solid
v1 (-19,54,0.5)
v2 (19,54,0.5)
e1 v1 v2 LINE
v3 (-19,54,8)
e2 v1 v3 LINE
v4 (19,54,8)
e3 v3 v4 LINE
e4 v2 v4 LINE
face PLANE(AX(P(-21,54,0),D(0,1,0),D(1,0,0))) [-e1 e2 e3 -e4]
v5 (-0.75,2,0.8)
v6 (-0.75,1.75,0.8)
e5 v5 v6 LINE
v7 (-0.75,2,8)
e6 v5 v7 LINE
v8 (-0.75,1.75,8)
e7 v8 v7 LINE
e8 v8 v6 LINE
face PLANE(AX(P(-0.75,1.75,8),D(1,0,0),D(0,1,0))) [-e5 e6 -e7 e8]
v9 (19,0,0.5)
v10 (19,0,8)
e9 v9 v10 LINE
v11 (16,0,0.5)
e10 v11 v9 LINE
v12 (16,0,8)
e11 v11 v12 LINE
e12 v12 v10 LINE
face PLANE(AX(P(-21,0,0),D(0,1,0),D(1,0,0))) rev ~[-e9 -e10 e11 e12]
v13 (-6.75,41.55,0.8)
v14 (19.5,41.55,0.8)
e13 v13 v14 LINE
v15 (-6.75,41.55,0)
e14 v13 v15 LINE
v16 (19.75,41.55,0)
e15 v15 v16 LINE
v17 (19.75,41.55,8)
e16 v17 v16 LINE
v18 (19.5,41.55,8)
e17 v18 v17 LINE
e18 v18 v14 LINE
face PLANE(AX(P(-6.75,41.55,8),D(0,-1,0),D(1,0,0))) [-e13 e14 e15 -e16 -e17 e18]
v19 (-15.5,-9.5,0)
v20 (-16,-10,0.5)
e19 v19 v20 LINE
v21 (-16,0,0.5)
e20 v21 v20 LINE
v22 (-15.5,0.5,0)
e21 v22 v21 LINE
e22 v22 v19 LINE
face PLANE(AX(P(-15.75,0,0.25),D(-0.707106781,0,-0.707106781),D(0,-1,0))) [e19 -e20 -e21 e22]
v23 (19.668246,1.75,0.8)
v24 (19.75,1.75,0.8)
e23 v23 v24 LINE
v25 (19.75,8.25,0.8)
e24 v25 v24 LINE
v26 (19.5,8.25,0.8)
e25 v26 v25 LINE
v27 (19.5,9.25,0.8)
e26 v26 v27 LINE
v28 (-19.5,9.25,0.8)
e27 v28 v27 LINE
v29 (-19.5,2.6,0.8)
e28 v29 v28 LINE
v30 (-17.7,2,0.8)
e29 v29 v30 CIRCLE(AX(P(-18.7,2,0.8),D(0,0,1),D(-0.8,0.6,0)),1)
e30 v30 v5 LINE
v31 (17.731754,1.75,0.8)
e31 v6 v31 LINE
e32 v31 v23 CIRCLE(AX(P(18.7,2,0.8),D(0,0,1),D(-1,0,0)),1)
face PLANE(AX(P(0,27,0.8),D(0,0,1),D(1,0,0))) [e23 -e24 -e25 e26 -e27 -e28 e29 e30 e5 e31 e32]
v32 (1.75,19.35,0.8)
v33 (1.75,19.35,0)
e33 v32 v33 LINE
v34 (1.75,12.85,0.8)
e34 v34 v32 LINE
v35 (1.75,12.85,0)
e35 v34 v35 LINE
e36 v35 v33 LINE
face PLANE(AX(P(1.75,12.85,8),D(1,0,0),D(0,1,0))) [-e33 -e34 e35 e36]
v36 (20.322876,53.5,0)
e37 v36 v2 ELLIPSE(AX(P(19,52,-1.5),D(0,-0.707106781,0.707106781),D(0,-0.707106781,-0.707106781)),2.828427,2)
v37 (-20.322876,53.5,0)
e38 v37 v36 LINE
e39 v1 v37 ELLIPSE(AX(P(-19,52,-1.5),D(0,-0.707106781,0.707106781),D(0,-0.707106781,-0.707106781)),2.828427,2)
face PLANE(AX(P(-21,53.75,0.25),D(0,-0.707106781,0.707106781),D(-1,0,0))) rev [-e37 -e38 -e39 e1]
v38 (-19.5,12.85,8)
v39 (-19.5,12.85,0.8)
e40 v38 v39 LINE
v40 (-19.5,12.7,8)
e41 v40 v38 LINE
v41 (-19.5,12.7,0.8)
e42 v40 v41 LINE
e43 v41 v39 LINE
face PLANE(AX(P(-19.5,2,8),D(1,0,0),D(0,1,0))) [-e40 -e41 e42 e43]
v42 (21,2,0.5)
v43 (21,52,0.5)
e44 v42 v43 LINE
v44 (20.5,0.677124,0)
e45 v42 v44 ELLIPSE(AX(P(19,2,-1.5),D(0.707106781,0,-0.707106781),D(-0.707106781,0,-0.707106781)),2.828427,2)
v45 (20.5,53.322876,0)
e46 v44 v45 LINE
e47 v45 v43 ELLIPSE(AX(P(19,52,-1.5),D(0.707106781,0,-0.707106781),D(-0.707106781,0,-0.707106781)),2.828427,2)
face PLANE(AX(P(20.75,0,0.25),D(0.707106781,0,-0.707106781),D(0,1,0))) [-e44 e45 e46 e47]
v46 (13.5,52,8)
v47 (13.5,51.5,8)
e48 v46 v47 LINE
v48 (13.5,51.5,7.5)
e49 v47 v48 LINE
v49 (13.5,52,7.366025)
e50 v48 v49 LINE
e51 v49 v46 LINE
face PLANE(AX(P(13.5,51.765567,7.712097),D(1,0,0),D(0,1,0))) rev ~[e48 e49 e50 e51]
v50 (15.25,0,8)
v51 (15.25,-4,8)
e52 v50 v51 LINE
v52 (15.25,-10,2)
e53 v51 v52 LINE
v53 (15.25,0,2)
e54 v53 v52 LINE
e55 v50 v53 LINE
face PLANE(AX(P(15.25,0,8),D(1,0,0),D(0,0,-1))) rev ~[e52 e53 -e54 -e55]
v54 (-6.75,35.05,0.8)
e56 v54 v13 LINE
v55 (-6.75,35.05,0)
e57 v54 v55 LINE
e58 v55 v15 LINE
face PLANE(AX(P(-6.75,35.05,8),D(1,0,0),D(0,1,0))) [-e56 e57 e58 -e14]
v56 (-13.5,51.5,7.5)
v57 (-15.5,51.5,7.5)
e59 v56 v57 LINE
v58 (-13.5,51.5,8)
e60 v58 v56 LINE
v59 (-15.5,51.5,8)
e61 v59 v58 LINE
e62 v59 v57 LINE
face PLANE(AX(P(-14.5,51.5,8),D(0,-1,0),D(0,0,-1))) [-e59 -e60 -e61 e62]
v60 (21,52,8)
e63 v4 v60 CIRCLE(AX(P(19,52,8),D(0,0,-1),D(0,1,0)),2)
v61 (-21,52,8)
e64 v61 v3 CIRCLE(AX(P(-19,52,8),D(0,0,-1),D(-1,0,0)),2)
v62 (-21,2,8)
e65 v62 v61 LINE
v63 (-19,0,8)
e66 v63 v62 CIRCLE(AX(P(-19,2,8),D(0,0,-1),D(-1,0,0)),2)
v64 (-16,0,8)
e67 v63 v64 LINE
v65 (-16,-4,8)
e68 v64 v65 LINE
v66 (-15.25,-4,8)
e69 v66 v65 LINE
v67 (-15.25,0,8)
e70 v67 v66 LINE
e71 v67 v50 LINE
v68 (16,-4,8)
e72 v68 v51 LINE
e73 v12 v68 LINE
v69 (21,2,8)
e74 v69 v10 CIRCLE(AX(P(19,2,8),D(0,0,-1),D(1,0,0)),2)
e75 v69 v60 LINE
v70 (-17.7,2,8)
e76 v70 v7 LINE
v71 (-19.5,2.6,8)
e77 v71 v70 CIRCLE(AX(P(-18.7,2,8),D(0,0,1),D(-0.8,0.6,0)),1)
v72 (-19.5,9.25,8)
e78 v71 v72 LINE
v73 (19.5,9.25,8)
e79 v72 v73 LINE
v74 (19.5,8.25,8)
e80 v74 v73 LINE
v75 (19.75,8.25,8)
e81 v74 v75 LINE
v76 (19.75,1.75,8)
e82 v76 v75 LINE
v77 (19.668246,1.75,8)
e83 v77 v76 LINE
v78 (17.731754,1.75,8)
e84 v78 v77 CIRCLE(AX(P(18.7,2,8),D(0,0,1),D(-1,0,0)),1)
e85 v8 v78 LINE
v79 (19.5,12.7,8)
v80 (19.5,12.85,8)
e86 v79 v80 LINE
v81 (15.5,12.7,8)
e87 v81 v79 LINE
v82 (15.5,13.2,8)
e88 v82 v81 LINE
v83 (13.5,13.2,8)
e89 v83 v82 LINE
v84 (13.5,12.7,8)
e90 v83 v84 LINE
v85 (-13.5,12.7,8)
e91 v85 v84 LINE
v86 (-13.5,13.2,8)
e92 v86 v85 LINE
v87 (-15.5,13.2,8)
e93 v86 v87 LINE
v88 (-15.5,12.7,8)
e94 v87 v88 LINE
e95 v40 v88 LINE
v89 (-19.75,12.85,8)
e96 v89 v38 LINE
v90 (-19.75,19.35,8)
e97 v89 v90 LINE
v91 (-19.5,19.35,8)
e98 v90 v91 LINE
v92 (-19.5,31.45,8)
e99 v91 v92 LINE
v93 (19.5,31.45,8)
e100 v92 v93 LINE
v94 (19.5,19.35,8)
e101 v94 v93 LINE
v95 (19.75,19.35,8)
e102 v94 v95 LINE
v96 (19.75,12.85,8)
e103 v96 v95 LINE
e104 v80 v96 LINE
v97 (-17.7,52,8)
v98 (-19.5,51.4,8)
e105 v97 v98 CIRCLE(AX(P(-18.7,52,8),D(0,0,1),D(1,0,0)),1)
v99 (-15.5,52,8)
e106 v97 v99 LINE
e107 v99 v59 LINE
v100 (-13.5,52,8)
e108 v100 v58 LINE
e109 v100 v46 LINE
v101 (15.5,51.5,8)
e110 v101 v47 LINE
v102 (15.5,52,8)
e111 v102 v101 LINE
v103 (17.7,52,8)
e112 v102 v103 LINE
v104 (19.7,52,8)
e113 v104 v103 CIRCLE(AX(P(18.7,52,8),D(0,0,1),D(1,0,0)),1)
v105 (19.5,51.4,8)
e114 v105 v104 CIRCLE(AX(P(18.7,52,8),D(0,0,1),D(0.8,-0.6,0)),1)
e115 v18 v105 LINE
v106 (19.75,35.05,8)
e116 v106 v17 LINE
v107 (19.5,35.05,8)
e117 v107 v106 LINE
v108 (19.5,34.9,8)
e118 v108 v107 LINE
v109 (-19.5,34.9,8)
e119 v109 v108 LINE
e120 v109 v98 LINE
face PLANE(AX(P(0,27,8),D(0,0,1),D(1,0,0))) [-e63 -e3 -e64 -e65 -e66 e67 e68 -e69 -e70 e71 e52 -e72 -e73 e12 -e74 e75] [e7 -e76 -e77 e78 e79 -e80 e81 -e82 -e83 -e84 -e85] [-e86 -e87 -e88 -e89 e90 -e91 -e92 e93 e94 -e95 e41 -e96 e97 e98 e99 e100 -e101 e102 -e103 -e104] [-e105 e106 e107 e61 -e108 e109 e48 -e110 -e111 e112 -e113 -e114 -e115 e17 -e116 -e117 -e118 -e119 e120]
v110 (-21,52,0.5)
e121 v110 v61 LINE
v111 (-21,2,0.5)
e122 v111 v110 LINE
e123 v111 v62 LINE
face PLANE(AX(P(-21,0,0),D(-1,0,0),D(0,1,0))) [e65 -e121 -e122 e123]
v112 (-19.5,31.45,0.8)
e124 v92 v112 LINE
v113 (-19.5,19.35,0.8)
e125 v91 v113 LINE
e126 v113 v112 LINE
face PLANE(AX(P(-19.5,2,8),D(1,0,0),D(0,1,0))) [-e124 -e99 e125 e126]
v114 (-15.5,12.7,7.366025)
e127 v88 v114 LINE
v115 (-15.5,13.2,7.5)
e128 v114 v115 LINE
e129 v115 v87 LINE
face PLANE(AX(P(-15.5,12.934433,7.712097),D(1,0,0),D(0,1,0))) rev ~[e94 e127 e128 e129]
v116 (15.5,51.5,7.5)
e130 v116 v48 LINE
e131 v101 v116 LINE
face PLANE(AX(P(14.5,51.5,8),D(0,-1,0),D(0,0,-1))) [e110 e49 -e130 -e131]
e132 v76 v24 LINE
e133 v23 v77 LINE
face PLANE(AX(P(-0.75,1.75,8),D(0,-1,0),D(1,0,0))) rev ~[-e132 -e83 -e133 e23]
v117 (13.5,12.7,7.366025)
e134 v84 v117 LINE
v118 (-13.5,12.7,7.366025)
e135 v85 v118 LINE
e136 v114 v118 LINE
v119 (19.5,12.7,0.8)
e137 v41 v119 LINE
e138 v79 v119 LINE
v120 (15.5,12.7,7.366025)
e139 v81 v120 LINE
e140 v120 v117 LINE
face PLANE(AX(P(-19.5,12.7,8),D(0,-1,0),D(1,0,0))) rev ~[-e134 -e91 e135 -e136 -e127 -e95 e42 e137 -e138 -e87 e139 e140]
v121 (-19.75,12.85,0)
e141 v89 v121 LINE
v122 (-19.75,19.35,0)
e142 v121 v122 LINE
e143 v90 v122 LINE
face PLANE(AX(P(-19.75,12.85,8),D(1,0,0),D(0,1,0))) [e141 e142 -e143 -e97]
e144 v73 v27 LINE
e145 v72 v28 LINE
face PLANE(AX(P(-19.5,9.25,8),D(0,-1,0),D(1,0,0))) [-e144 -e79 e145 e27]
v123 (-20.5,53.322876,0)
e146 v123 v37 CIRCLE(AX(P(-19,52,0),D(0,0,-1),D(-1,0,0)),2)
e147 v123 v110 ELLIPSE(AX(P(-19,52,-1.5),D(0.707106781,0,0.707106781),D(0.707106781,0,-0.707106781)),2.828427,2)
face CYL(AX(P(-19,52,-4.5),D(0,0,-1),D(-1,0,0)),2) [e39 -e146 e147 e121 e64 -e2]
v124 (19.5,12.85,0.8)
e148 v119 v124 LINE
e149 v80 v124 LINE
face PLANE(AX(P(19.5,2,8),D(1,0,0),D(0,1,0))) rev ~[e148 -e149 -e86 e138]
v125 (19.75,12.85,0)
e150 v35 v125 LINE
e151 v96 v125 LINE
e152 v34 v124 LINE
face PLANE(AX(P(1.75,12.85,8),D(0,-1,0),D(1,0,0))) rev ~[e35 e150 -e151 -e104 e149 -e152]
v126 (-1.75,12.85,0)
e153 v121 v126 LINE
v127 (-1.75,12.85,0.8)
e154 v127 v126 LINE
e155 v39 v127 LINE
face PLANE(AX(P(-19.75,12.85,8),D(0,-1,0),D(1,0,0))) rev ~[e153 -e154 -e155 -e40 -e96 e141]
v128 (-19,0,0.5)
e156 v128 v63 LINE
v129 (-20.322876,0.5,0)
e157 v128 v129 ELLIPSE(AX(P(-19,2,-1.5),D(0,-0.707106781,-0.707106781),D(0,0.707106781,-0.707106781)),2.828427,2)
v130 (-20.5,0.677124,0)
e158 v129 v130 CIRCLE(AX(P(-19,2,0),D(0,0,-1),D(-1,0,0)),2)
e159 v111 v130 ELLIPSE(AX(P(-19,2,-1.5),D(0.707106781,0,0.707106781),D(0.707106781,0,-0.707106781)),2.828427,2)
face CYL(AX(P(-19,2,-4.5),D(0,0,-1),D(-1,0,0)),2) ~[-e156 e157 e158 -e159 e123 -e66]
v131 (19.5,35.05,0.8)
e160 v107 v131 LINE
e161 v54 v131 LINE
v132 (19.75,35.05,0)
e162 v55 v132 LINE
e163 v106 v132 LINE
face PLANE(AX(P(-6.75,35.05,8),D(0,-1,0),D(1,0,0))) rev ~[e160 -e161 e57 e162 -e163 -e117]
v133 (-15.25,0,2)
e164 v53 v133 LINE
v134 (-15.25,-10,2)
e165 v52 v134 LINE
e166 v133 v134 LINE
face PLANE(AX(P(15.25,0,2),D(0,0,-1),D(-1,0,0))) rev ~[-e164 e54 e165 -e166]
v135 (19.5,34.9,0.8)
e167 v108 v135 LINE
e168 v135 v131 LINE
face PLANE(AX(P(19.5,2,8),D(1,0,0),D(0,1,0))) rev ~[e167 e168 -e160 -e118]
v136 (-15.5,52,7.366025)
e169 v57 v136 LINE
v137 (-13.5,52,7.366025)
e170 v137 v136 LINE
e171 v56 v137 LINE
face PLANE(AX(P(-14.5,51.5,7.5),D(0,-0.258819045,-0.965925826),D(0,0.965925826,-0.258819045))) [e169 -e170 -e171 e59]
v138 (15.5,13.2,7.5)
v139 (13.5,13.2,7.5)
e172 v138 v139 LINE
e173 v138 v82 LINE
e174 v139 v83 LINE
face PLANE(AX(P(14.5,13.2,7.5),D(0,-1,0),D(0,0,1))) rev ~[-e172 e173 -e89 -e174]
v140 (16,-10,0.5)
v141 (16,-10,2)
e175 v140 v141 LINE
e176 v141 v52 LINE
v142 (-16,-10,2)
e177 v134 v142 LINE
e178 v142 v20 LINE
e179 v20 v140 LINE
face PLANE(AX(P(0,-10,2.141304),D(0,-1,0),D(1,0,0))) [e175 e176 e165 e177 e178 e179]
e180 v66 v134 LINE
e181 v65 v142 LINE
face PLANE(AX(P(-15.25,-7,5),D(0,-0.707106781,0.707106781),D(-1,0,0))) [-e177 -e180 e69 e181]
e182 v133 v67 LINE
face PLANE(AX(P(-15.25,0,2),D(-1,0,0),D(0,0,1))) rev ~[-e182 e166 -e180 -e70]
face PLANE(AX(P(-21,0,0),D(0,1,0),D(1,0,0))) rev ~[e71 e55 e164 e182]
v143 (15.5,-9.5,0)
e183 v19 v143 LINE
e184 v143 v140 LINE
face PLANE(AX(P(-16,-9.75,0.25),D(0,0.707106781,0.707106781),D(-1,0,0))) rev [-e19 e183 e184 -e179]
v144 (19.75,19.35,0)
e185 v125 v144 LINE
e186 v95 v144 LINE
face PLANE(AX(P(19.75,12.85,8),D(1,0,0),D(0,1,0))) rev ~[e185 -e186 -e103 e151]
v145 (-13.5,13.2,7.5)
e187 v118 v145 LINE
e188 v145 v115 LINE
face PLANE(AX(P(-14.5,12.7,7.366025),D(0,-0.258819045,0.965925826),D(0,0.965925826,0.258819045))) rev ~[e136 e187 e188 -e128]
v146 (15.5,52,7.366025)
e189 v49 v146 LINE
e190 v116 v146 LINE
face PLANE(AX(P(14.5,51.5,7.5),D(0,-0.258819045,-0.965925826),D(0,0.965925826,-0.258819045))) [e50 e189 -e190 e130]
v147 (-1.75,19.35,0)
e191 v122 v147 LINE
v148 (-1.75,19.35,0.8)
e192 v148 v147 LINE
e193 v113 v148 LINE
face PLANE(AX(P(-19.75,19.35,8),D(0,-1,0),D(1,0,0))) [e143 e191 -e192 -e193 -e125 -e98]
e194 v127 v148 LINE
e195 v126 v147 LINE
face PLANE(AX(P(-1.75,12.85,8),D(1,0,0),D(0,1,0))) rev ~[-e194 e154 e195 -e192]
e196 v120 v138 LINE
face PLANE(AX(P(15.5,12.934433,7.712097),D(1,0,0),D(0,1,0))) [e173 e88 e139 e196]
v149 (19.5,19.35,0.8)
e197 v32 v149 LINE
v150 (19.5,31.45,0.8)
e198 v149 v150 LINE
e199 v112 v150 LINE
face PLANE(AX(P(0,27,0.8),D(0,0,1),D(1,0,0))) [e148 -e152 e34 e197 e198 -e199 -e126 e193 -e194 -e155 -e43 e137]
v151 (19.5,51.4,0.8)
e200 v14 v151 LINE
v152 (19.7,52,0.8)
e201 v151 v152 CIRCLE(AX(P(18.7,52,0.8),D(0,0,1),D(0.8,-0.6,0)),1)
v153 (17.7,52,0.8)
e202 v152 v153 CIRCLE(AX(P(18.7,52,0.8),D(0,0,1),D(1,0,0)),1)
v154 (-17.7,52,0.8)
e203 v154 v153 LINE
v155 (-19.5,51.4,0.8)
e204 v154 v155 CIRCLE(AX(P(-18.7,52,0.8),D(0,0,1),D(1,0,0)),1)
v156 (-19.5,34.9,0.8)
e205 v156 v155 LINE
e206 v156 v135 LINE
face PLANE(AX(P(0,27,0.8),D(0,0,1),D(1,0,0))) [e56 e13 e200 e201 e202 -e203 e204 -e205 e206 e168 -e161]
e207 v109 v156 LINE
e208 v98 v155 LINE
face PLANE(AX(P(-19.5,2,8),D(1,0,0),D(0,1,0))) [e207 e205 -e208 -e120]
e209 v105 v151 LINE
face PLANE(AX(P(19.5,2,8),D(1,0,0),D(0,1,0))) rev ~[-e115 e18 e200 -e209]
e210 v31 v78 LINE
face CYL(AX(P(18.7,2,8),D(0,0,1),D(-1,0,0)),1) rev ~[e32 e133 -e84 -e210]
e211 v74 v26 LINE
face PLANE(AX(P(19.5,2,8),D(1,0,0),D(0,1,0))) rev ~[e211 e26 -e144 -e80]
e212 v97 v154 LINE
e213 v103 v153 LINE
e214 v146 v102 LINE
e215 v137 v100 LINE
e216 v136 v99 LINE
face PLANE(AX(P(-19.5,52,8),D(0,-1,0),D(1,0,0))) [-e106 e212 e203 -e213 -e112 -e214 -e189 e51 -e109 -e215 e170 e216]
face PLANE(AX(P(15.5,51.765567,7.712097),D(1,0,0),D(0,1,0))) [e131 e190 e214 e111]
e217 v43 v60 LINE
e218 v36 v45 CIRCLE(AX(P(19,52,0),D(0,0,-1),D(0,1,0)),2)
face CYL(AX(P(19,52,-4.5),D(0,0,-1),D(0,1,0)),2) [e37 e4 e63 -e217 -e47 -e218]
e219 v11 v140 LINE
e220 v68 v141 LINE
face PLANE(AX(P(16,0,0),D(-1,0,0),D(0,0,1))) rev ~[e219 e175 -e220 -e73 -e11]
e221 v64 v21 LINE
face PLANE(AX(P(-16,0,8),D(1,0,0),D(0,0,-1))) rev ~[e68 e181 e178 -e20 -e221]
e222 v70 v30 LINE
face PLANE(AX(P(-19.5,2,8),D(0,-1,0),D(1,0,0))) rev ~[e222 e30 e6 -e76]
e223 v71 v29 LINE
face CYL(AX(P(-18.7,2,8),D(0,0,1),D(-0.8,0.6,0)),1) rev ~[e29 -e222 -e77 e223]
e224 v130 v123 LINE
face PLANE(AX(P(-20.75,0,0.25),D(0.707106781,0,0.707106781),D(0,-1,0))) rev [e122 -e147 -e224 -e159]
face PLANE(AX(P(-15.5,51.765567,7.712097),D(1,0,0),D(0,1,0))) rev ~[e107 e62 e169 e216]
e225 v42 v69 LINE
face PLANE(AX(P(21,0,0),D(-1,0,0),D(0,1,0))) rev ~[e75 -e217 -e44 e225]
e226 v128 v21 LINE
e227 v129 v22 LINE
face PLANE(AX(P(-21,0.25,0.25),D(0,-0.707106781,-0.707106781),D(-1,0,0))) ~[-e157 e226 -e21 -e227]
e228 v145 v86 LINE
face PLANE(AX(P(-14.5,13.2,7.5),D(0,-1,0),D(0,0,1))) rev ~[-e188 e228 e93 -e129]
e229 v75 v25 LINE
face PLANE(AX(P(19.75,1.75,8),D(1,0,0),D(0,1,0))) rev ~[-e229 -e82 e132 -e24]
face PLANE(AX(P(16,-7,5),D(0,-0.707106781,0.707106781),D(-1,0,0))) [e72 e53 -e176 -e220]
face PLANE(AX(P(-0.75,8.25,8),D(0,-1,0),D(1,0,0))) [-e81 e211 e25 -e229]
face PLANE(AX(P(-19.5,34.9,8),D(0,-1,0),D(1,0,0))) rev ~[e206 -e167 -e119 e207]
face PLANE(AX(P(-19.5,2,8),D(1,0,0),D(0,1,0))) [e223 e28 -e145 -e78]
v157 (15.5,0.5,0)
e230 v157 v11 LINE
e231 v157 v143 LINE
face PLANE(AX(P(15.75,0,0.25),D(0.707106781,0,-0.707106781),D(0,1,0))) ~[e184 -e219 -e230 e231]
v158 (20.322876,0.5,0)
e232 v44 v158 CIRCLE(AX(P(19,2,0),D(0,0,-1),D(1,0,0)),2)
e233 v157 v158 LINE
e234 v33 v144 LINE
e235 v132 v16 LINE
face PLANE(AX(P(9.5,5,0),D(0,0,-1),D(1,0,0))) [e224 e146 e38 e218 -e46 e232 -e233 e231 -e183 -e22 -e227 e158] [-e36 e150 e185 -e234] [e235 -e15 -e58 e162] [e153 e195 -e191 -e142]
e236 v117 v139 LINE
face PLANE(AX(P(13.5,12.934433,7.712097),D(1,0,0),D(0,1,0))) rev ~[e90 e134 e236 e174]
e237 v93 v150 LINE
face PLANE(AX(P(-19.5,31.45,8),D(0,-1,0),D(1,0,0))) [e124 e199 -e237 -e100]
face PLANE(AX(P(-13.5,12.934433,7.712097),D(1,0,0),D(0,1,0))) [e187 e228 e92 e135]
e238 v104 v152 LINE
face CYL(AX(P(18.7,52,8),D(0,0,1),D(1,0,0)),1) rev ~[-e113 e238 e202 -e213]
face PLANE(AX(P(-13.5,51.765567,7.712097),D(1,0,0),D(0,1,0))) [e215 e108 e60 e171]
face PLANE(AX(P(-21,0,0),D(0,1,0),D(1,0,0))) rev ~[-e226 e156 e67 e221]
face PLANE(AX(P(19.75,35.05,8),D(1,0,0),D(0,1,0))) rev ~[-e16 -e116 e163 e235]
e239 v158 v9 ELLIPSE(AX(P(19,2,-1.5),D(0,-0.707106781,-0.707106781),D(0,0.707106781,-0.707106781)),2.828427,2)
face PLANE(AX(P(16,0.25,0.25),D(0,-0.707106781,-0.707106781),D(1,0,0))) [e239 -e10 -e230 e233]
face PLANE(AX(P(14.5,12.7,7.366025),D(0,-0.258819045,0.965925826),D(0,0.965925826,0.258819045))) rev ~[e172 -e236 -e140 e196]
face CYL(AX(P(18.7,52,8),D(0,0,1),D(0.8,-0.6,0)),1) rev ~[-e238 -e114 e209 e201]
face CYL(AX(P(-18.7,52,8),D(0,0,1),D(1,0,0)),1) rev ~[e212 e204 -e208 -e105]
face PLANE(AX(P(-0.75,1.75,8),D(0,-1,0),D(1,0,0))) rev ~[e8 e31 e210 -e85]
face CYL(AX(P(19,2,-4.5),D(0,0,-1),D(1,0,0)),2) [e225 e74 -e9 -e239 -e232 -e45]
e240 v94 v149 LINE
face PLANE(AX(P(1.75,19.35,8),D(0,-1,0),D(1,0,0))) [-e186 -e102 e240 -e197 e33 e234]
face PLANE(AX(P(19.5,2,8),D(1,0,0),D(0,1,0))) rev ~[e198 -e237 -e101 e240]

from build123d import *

# Parameters (mm, degrees)
F0_W         = 42
F0_H         = 54
F1_DEPTH     = 8
F2_W         = 39
F2_H         = 50
F3_DEPTH     = 7.2
F5_DEPTH     = 7.2
F6_W         = 20.5
F6_H         = 6.5
F6_W_2       = 18
F6_W_3       = 26.5
F7_DEPTH     = 8.001
F9_DEPTH     = 10
F10_SIZE     = 0.5
F11_T1_DEPTH = 17.5
F12_W        = 39
F12_H        = 3.45
F13_DEPTH    = 7.2
F16_DEPTH    = 1
F19_DEPTH    = 1
F20_SIZE     = 6
F22_W        = 20.5
F22_H        = 6.5
F23_DEPTH    = 0.8


# Not quite as in the source:
# - a fillet or chamfer that OpenCascade refuses, or shapes differently, is made with other operations: its cross-section is extruded or revolved along the edge and cut away or added


with BuildPart() as f1:
    # F0 (on Top) → F1 (new body)
    with BuildSketch(Plane.XY):
        with Locations((0, 27)):
            Rectangle(F0_W, F0_H)
    extrude(amount=F1_DEPTH)

    # F2 (on face) → F3 (cut)
    with BuildSketch(Plane.XY.offset(8)):
        with Locations((0, 27)):
            Rectangle(F2_W, F2_H)
    extrude(amount=-F3_DEPTH, mode=Mode.SUBTRACT)

    # F4 (on face) → F5 (cut, through all)
    with BuildSketch(Plane.XY.offset(8)):
        with BuildLine():
            Line((-19.5, 52), (-17.7, 52))
            ThreePointArc((-17.7, 52), (-19.016227766, 52.9486832981), (-19.5, 51.4))
            Line((-19.5, 51.4), (-19.5, 52))
        make_face()
        with BuildLine():
            ThreePointArc((-19.5, 51.4), (-18.383772234, 51.0513167019), (-17.7, 52))
            Line((-17.7, 52), (-19.5, 52))
            Line((-19.5, 52), (-19.5, 51.4))
        make_face()
        with BuildLine():
            Line((19.5, 52), (17.7, 52))
            ThreePointArc((17.7, 52), (18.383772234, 51.0513167019), (19.5, 51.4))
            Line((19.5, 51.4), (19.5, 52))
        make_face()
        with BuildLine():
            ThreePointArc((19.7, 52), (18.7, 53), (17.7, 52))
            Line((17.7, 52), (19.5, 52))
            Line((19.5, 52), (19.5, 51.4))
            ThreePointArc((19.5, 51.4), (19.6486832981, 51.683772234), (19.7, 52))
        make_face()
        with BuildLine():
            Line((19.5, 2), (19.5, 2.6))
            ThreePointArc((19.5, 2.6), (18.383772234, 2.9486832981), (17.7, 2))
            Line((17.7, 2), (19.5, 2))
        make_face()
        with BuildLine():
            ThreePointArc((-17.7, 2), (-18.383772234, 2.9486832981), (-19.5, 2.6))
            Line((-19.5, 2.6), (-19.5, 2))
            Line((-19.5, 2), (-17.7, 2))
        make_face()
        with BuildLine():
            Line((-19.5, 2), (-19.5, 2.6))
            ThreePointArc((-19.5, 2.6), (-19.016227766, 1.0513167019), (-17.7, 2))
            Line((-17.7, 2), (-19.5, 2))
        make_face()
        with BuildLine():
            ThreePointArc((19.7, 2), (19.6486832981, 2.316227766), (19.5, 2.6))
            Line((19.5, 2.6), (19.5, 2))
            Line((19.5, 2), (17.7, 2))
            ThreePointArc((17.7, 2), (18.7, 1), (19.7, 2))
        make_face()
    extrude(amount=-F5_DEPTH, mode=Mode.SUBTRACT)

    # F6 (on face) → F7 (cut, through all)
    with BuildSketch(Plane.XY.offset(8)):
        with Locations((9.5, 5)):
            Rectangle(F6_W, F6_H)
        with Locations((10.75, 16.1)):
            Rectangle(F6_W_2, F6_H)
        with Locations((-10.75, 16.1)):
            Rectangle(F6_W_2, F6_H)
        with Locations((6.5, 38.3)):
            Rectangle(F6_W_3, F6_H)
    extrude(amount=-F7_DEPTH, mode=Mode.SUBTRACT)

    # F8 (on face) → F9 (join)
    with BuildSketch(Plane.XZ):
        Polygon((-15.25, 2), (-15.25, 8), (-16, 8), (-16, 0), (16, 0), (16, 8), (15.25, 8), (15.25, 2), align=None)
    extrude(amount=F9_DEPTH)

    # F10
    f10_edges = [f1.edges().sort_by_distance(p)[0] for p in [
        (16, -5, 0),
        (18.5, 0, 0),
        (21, 27, 0),
        (-16, -5, 0),
        (-18.5, 0, 0),
        (-21, 27, 0),
        (0, 54, 0),
        (0, -10, 0),
    ]]
    chamfer(f10_edges, length=F10_SIZE)

    # F11: fillet of radius 2 on 4 edges, made by hand

    # F11_s2 → F11_t1 (cut)
    with BuildSketch(Plane.XY.offset(-4.5)):
        with BuildLine():
            ThreePointArc((21, 2), (20.4142135624, 0.5857864376), (19, 0))
            Line((19, 0), (21, 0))
            Line((21, 0), (21, 2))
        make_face()
        with BuildLine():
            ThreePointArc((19, 54), (20.4142135624, 53.4142135624), (21, 52))
            Line((21, 52), (21, 54))
            Line((21, 54), (19, 54))
        make_face()
        with BuildLine():
            ThreePointArc((-21, 2), (-20.4142135624, 0.5857864376), (-19, 0))
            Line((-19, 0), (-21, 0))
            Line((-21, 0), (-21, 2))
        make_face()
        with BuildLine():
            ThreePointArc((-21, 52), (-20.4142135624, 53.4142135624), (-19, 54))
            Line((-19, 54), (-21, 54))
            Line((-21, 54), (-21, 52))
        make_face()
    extrude(amount=F11_T1_DEPTH, mode=Mode.SUBTRACT)

    # F12 (on face) → F13 (join, through all)
    with BuildSketch(Plane.XY.offset(8)):
        with Locations((0, 10.975)):
            Rectangle(F12_W, F12_H)
        with Locations((0, 33.175)):
            Rectangle(F12_W, F12_H)
    extrude(amount=-F13_DEPTH)

    # F15 (on offset) → F16 (join, symmetric)
    with BuildSketch(Plane.YZ.offset(-14.5)):
        Polygon((13.2, 8), (12.7, 8), (12.7, 7.3660254038), (13.2, 7.5), align=None)
        Polygon((52, 7.3660254038), (52, 8), (51.5, 8), (51.5, 7.5), align=None)
    extrude(amount=F16_DEPTH, both=True)

    # F18 (on offset) → F19 (join, symmetric)
    with BuildSketch(Plane.YZ.offset(14.5)):
        Polygon((13.2, 7.5), (13.2, 8), (12.7, 8), (12.7, 7.3660254038), align=None)
        Polygon((51.5, 7.5), (52, 7.3660254038), (52, 8), (51.5, 8), align=None)
    extrude(amount=F19_DEPTH, both=True)

    # F20
    f20_edges = [f1.edges().sort_by_distance(p)[0] for p in [
        (-15.625, -10, 8),
        (15.625, -10, 8),
    ]]
    chamfer(f20_edges, length=F20_SIZE)

    # F22 (on face) → F23 (join)
    with BuildSketch(Plane(origin=(0, 0, 0), x_dir=(1, 0, 0), z_dir=(0, 0, -1))):
        with Locations((9.5, -5)):
            Rectangle(F22_W, F22_H)
    extrude(amount=-F23_DEPTH)


solid = f1.part
